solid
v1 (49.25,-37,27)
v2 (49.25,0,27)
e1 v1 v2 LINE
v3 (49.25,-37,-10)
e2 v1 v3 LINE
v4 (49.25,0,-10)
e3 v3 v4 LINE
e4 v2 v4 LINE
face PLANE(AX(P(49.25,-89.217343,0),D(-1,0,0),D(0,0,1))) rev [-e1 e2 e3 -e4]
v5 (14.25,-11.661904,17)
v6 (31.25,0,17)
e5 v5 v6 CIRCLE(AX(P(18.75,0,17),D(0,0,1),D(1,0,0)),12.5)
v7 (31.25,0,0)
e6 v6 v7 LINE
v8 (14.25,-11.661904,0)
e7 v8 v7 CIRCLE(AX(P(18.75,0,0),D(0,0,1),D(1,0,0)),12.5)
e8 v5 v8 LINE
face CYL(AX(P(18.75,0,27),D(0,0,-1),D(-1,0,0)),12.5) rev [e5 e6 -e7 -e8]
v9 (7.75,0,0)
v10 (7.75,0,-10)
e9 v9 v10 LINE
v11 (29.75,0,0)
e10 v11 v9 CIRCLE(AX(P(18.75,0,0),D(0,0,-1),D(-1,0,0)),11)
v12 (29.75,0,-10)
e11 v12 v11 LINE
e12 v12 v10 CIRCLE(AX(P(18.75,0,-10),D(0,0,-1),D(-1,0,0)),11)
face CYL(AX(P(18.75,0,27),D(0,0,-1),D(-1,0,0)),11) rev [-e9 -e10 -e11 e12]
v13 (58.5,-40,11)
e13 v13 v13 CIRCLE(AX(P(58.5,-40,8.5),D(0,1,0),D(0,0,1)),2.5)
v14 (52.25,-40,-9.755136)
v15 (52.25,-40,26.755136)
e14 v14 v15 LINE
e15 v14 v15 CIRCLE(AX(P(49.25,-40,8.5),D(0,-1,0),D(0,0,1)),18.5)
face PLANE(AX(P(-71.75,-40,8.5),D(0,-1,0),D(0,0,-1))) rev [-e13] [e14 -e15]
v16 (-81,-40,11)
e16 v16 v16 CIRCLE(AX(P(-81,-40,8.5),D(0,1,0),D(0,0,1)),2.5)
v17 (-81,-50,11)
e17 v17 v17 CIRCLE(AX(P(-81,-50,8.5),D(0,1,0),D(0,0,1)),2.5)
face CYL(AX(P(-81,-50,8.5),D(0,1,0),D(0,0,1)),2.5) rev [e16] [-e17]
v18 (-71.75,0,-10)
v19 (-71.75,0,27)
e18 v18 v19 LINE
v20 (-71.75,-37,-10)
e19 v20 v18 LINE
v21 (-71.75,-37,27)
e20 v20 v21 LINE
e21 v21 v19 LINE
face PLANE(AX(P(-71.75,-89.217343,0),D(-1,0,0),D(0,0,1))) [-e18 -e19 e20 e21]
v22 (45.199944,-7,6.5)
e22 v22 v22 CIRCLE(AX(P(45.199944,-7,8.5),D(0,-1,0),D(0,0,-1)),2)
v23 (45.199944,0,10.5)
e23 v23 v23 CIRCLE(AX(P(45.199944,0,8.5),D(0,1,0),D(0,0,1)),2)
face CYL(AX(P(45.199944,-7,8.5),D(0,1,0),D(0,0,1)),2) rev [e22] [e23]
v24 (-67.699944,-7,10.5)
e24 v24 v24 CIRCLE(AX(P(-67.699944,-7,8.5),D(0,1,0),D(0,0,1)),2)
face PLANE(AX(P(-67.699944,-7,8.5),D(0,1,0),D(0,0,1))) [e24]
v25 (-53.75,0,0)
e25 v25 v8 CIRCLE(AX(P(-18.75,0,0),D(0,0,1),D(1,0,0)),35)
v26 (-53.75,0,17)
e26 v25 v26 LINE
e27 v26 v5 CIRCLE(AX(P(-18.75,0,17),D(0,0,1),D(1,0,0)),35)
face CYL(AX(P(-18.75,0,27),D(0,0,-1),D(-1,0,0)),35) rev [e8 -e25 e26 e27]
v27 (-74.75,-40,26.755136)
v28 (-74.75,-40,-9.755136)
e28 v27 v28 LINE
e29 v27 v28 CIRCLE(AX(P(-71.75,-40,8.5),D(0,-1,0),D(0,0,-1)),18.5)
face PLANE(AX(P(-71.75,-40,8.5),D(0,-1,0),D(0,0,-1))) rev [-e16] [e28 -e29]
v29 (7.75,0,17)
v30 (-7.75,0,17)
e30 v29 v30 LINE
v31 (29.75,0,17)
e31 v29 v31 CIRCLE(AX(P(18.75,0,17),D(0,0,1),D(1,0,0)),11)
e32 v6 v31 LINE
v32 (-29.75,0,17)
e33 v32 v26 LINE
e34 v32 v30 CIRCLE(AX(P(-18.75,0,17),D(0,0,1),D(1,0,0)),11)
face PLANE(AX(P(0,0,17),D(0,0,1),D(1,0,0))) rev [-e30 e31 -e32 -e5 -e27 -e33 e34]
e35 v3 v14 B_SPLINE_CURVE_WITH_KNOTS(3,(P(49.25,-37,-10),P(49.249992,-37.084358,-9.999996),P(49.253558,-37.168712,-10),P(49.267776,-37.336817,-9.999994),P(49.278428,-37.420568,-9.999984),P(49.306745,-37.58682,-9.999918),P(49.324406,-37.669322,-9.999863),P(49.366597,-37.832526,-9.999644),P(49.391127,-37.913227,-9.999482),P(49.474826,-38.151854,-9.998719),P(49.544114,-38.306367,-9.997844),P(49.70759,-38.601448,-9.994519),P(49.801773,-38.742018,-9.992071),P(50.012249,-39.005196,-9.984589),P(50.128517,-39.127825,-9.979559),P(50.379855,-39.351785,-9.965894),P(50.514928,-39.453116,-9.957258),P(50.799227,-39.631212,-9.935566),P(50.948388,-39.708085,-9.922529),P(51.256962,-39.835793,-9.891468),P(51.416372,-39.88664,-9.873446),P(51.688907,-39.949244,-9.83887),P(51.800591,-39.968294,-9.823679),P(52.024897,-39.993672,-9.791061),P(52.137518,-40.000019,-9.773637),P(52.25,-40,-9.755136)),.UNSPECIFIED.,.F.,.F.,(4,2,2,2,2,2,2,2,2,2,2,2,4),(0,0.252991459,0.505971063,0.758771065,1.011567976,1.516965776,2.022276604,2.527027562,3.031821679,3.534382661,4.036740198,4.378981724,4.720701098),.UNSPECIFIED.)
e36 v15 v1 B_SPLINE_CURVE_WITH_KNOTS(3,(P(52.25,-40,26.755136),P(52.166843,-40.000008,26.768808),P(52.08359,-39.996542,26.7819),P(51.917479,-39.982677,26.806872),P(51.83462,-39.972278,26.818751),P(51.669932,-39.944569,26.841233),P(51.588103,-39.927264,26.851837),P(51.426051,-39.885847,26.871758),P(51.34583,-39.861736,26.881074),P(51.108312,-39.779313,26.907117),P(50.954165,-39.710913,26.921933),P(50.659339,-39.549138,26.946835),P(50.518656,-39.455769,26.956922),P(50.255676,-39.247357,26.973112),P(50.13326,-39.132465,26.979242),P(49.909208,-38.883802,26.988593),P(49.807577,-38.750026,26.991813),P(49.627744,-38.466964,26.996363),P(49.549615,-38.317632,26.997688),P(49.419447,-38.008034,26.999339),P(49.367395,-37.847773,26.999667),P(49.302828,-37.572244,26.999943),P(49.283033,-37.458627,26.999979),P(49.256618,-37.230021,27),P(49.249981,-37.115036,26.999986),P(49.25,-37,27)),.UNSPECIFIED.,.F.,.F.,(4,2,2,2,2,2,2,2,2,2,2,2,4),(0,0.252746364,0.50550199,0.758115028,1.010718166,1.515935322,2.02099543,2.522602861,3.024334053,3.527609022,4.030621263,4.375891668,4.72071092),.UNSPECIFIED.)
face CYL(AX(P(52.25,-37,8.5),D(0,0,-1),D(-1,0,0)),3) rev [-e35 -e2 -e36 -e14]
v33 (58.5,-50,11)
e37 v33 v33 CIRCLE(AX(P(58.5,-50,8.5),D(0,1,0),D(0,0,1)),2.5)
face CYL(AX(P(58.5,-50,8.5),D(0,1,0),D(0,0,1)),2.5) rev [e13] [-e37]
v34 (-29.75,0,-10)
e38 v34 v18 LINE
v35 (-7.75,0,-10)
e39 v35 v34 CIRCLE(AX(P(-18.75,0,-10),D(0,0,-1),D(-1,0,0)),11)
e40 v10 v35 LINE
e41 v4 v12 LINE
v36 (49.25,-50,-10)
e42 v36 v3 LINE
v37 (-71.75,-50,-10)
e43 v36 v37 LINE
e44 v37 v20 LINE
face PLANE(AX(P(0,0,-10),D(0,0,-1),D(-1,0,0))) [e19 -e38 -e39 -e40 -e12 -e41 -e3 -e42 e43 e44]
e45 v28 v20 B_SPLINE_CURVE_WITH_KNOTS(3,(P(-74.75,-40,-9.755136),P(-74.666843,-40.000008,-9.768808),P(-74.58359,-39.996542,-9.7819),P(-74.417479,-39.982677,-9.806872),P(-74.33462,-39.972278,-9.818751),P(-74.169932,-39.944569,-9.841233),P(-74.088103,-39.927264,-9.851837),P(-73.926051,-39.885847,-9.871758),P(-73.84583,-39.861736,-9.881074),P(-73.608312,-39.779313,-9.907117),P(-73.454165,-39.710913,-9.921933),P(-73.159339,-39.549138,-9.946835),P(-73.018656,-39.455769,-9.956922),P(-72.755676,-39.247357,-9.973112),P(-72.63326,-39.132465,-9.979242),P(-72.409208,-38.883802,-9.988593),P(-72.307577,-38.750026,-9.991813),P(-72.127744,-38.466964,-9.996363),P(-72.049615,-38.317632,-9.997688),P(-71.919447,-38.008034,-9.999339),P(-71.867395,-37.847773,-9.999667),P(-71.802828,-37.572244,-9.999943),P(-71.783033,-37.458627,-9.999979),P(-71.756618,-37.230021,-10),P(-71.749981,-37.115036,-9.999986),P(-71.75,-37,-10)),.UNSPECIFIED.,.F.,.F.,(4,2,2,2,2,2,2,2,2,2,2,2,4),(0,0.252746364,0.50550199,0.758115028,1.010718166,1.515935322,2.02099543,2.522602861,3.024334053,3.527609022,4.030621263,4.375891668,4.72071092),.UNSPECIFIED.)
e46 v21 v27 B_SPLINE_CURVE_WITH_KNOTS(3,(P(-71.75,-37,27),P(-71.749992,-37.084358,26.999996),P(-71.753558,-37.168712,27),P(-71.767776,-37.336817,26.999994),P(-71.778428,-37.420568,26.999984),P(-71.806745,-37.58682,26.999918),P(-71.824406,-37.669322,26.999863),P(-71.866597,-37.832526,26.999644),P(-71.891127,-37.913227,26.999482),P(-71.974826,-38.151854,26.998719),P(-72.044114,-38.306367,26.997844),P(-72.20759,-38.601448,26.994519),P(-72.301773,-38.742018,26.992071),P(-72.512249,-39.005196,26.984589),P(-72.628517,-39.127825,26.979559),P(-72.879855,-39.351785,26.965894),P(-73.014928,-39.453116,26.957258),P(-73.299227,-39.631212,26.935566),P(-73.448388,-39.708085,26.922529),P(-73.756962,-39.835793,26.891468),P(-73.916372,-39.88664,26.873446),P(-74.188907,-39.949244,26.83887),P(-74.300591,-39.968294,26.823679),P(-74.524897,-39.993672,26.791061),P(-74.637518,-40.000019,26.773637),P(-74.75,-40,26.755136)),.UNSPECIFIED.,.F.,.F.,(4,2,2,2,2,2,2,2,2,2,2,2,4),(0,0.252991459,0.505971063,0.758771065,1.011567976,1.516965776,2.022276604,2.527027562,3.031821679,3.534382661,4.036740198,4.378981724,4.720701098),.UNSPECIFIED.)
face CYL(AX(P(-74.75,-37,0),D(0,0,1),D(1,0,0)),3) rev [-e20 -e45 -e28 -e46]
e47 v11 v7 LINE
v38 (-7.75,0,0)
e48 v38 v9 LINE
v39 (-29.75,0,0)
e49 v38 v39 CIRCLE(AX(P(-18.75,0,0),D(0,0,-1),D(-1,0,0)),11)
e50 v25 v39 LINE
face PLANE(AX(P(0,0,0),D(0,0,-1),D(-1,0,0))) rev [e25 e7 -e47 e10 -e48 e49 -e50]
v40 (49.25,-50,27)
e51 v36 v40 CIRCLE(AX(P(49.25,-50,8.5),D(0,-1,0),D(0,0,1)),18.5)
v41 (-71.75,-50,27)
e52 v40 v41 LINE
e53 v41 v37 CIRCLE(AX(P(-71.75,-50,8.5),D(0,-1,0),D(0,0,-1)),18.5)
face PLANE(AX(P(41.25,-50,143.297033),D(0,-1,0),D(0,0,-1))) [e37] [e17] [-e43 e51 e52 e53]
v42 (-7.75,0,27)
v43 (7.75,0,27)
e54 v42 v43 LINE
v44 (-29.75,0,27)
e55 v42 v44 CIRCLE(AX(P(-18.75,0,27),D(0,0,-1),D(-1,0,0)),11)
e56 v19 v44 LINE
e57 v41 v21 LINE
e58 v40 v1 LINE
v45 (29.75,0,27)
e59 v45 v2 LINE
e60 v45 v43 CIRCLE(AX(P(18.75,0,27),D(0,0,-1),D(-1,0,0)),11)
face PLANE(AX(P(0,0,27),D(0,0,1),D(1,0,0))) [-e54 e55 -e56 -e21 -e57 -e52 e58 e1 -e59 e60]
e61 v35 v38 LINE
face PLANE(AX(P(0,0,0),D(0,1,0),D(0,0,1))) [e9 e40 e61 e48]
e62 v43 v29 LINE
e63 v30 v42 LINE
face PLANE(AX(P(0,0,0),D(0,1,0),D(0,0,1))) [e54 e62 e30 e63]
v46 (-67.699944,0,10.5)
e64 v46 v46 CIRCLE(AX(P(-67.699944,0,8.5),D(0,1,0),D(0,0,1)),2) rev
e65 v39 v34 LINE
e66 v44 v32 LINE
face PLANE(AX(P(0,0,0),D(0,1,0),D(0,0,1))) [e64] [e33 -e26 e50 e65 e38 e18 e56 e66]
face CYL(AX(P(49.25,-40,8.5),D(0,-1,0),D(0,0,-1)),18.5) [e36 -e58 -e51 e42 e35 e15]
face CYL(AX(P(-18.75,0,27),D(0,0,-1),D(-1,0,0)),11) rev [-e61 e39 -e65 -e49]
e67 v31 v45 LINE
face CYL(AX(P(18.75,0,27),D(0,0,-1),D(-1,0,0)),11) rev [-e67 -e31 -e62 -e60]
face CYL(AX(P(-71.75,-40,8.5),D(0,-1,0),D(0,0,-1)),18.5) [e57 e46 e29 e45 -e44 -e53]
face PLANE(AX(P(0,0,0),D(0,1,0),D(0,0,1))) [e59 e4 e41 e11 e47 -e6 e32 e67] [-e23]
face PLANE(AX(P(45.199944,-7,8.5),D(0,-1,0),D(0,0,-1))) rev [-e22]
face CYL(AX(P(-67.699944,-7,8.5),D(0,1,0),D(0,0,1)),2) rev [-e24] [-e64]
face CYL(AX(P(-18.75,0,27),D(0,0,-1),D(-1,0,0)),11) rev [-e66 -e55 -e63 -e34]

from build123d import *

# Parameters (mm, degrees)
BOSS_EXTRUDE2_DEPTH      = 27
SHELL5_DEPTH             = 17
BOSS_EXTRUDE3_START      = 10
BOSS_EXTRUDE3_DEPTH      = 10
SKETCH5_R                = 11
CUT_EXTRUDE2_DEPTH       = 87.360074687
BOSS_EXTRUDE4_DEPTH      = 37
BOSS_EXTRUDE5_DEPTH      = 3
BOSS_EXTRUDE5_DEPTH_BACK = 50
SKETCH10_R               = 2
CUT_EXTRUDE3_DEPTH       = 10
SKETCH11_W               = 121
SKETCH11_H               = 37
CUT_EXTRUDE4_DEPTH       = 92.526294036
BOSS_EXTRUDE6_DEPTH      = 10
FILLET1_R                = 3
SKETCH13_R               = 2.5
CUT_EXTRUDE5_DEPTH       = 103.342867477


# Read off the part's stored shape, not the designer's step: Shell5
with BuildPart() as part:
    # Sketch1 → Boss-Extrude2 (new body)
    with BuildSketch(Plane.XY):
        with BuildLine():
            ThreePointArc((20.25, 22.449944321), (-63.75, 0), (20.25, -22.449944321))
            ThreePointArc((20.25, -22.449944321), (41.25, 0), (20.25, 22.449944321))
        make_face()
    extrude(amount=BOSS_EXTRUDE2_DEPTH)

    # Shell5 outline → Shell5 (cut)
    with BuildSketch(Plane.XY):
        with BuildLine():
            ThreePointArc((14.25, -11.66190379), (31.25, 0), (14.25, 11.66190379))
            ThreePointArc((14.25, 11.66190379), (-53.75, 0), (14.25, -11.66190379))
        make_face()
    extrude(amount=SHELL5_DEPTH, mode=Mode.SUBTRACT)

    # Sketch4 → Boss-Extrude3 (add)
    with BuildSketch(Plane(origin=(0, 0, 0), x_dir=(-1, 0, 0), z_dir=(0, 0, -1)).offset(BOSS_EXTRUDE3_START)):
        with BuildLine():
            ThreePointArc((-20.25, 22.449944321), (-41.25, 0), (-20.25, -22.449944321))
            ThreePointArc((-20.25, -22.449944321), (63.75, 0), (-20.25, 22.449944321))
        make_face()
    extrude(amount=-BOSS_EXTRUDE3_DEPTH)

    # Sketch5 → Cut-Extrude2 (cut, through all)
    with BuildSketch(Plane(origin=(0, 0, -10), x_dir=(-1, 0, 0), z_dir=(0, 0, -1))):
        with Locations((-18.75, 0)):
            Circle(SKETCH5_R)
        with Locations((18.75, 0)):
            Circle(SKETCH5_R)
    extrude(amount=-CUT_EXTRUDE2_DEPTH, mode=Mode.SUBTRACT)

    # Sketch8 → Boss-Extrude4 (add)
    with BuildSketch(Plane(origin=(0, 0, -10), x_dir=(-1, 0, 0), z_dir=(0, 0, -1))):
        with BuildLine():
            Line((-41.25, 0), (-41.25, -50))
            Line((-41.25, -50), (63.75, -50))
            Line((63.75, -50), (63.75, 0))
            ThreePointArc((63.75, 0), (30.368950039, -43.474130239), (-20.25, -22.449944321))
            ThreePointArc((-20.25, -22.449944321), (-35.181676725, -15.370426149), (-41.25, 0))
        make_face()
    extrude(amount=-BOSS_EXTRUDE4_DEPTH)

    # Sketch9 → Boss-Extrude5 (add, two sides: drawn at the far end of the back side and taken through both)
    with BuildSketch(Plane(origin=(0, 0, 0), x_dir=(1, 0, 0), z_dir=(0, 1, 0)).offset(-BOSS_EXTRUDE5_DEPTH_BACK)):
        Polygon((-71.75, -27), (-58.75, -27), (-58.75, -8.5), (-58.75, 10), (-71.75, 10), align=None)
        Polygon((36.25, -8.5), (36.25, 10), (49.25, 10), (49.25, -27), (36.25, -27), align=None)
    extrude(amount=BOSS_EXTRUDE5_DEPTH + BOSS_EXTRUDE5_DEPTH_BACK)

    # Sketch10 → Cut-Extrude3 (cut)
    with BuildSketch(Plane(origin=(0, 3, 0), x_dir=(1, 0, 0), z_dir=(0, 1, 0))):
        with Locations(Location((-67.699944321, -8.5, 0), (0, 0, 270))):
            Circle(SKETCH10_R)
        with Locations(Location((45.199944321, -8.5, 0), (0, 0, 90))):
            Circle(SKETCH10_R)
    extrude(amount=-CUT_EXTRUDE3_DEPTH, mode=Mode.SUBTRACT)

    # Sketch11 → Cut-Extrude4 (cut, through all)
    with BuildSketch(Plane(origin=(0, 0, 0), x_dir=(1, 0, 0), z_dir=(0, 1, 0))):
        with Locations((-11.25, -8.5)):
            Rectangle(SKETCH11_W, SKETCH11_H)
    extrude(amount=CUT_EXTRUDE4_DEPTH, mode=Mode.SUBTRACT)

    # Sketch12 → Boss-Extrude6 (add)
    with BuildSketch(Plane.XZ.offset(50)):
        with BuildLine():
            Line((-71.75, 27), (49.25, 27))
            ThreePointArc((49.25, 27), (67.75, 8.5), (49.25, -10))
            Line((49.25, -10), (-71.75, -10))
            ThreePointArc((-71.75, -10), (-90.25, 8.5), (-71.75, 27))
        make_face()
    extrude(amount=-BOSS_EXTRUDE6_DEPTH)

    # Fillet1
    # the kernel refuses this fillet: 3 mm, written as the material it adds along each edge
    with BuildSketch(Plane(origin=(49.25, -40, -17.5), x_dir=(0, 1, 0), z_dir=(0, 0, 1))) as fillet1_piece_1_section:
        with BuildLine():
            CenterArc((FILLET1_R, -FILLET1_R), FILLET1_R, 90, 90)
            Line((0, -FILLET1_R), (0, 0))
            Line((0, 0), (FILLET1_R, 0))
        make_face()
    fillet1_piece_1 = extrude(amount=52, mode=Mode.PRIVATE)
    fillet1_piece_1 = fillet1_piece_1 & Plane(origin=(49.25, -39.329436552, 8.5), x_dir=(0, 0, 1), z_dir=(0, -1, 0)) * Cylinder(18.5, 116, mode=Mode.PRIVATE)
    add(fillet1_piece_1)
    with BuildSketch(Plane(origin=(-71.75, -40, -17.5), x_dir=(0, 1, 0), z_dir=(0, 0, 1))) as fillet1_piece_2_section:
        with BuildLine():
            CenterArc((FILLET1_R, FILLET1_R), FILLET1_R, 180, 90)
            Line((0, FILLET1_R), (0, 0))
            Line((0, 0), (FILLET1_R, 0))
        make_face()
    fillet1_piece_2 = extrude(amount=52, mode=Mode.PRIVATE)
    fillet1_piece_2 = fillet1_piece_2 & Plane(origin=(-71.75, -39.329436515, 8.5), x_dir=(0, 0, -1), z_dir=(0, -1, 0)) * Cylinder(18.5, 116, mode=Mode.PRIVATE)
    add(fillet1_piece_2)

    # Sketch13 → Cut-Extrude5 (cut, through all)
    with BuildSketch(Plane(origin=(0, -40, 0), x_dir=(1, 0, 0), z_dir=(0, 1, 0))):
        with Locations(Location((-81, -8.5, 0), (0, 0, 270))):
            Circle(SKETCH13_R)
        with Locations(Location((58.5, -8.5, 0), (0, 0, 270))):
            Circle(SKETCH13_R)
    extrude(amount=-CUT_EXTRUDE5_DEPTH, mode=Mode.SUBTRACT)


solid = part.part
